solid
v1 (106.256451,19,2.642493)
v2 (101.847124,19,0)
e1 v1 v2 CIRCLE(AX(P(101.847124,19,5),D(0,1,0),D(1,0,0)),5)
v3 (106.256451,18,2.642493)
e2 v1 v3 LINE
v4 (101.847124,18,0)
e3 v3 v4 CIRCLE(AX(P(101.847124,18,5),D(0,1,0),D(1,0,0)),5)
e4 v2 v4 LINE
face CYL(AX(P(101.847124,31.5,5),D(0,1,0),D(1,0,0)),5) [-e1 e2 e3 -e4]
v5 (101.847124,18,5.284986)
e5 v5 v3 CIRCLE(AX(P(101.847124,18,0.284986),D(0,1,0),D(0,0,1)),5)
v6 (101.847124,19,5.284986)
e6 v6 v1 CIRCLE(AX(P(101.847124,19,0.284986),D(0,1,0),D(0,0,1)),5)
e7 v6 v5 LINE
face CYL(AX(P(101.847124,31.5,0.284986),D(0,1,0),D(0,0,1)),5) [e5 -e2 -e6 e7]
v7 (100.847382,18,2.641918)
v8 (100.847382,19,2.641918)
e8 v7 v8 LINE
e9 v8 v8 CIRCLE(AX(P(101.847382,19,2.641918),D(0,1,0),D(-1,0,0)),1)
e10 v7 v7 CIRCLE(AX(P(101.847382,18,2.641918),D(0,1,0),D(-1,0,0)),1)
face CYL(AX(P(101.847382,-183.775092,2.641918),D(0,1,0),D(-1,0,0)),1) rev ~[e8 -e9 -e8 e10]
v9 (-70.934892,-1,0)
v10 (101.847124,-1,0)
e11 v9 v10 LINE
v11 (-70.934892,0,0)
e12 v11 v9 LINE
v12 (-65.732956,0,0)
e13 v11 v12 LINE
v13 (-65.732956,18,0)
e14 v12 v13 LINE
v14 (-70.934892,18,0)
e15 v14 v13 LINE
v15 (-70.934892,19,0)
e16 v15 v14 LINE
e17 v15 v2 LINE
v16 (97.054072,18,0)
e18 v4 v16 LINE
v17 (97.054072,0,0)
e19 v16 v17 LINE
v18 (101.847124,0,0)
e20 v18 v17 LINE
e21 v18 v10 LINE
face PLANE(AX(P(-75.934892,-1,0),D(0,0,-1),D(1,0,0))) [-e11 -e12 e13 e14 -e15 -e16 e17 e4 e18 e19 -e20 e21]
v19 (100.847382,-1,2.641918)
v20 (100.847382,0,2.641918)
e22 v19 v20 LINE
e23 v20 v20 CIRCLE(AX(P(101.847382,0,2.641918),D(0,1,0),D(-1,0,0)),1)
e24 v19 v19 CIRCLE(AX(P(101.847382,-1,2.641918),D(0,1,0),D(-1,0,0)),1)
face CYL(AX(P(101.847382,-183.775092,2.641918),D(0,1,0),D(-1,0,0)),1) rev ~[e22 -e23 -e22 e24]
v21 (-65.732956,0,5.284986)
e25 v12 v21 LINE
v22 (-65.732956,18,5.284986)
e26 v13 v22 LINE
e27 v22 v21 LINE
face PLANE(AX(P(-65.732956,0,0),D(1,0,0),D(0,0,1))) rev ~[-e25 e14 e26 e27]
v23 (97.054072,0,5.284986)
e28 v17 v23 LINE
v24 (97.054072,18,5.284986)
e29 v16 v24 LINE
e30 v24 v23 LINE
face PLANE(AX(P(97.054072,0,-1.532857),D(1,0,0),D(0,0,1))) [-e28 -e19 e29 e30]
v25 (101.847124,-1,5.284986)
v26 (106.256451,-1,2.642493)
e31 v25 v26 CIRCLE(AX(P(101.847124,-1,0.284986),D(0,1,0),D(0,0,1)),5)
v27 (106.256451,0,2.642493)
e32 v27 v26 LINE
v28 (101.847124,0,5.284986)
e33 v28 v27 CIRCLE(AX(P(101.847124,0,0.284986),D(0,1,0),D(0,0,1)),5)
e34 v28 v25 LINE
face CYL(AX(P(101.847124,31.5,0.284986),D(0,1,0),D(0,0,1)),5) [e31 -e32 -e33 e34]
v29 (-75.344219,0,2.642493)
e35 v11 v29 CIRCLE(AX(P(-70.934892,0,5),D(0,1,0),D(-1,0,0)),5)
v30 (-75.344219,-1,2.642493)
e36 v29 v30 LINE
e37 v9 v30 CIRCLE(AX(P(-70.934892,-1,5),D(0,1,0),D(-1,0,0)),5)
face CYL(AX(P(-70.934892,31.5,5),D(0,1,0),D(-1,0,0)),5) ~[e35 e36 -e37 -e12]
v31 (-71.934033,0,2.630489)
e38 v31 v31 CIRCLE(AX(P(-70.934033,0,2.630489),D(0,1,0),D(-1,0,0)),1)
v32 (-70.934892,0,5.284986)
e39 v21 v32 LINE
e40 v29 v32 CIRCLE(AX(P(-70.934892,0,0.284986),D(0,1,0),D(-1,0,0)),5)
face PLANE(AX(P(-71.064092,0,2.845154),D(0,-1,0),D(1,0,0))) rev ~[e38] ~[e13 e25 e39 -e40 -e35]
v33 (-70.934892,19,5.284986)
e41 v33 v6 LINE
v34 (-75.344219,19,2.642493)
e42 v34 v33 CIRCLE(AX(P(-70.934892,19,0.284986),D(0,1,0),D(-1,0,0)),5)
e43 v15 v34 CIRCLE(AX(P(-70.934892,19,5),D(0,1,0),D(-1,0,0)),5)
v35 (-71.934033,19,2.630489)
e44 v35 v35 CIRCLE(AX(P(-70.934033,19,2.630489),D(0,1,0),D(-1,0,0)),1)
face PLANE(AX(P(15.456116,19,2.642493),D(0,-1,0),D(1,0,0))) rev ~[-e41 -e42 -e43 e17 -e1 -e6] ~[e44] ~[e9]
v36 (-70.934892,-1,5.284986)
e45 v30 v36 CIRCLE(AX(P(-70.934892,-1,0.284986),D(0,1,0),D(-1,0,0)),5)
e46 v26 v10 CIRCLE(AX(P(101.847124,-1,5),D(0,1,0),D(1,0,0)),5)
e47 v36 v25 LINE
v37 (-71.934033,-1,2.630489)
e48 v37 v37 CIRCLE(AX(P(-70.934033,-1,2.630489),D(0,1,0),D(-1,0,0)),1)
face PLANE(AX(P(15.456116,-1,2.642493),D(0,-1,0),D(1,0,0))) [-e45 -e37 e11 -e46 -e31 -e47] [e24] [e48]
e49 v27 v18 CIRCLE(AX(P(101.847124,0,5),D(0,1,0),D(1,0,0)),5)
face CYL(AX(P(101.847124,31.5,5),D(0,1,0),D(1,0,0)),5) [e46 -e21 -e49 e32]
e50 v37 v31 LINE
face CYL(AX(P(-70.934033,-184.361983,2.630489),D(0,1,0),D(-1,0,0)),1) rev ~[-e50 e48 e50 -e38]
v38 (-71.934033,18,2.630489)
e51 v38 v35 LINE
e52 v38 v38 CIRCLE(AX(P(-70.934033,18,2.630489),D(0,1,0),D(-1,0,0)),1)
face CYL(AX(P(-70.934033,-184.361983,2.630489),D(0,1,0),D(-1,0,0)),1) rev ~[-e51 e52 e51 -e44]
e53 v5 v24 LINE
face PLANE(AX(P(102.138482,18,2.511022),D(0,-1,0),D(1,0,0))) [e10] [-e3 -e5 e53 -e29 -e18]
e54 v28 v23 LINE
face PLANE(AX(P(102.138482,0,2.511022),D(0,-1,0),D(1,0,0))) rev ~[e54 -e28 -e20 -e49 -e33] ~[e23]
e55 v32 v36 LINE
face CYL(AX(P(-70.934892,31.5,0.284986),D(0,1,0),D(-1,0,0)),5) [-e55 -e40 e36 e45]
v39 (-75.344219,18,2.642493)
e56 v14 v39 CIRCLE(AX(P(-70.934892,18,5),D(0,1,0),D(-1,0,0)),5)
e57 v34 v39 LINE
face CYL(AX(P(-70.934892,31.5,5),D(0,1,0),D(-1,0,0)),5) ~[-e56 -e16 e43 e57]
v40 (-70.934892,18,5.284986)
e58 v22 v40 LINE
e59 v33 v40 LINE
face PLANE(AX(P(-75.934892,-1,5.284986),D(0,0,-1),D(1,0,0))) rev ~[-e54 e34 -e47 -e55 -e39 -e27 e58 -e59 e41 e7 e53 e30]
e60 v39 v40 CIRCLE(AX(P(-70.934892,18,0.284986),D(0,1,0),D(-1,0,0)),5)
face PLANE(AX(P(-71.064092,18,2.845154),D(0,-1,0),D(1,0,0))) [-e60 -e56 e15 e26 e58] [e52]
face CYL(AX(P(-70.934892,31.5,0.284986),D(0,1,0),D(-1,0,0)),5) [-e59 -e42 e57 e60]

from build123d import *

# Parameters (mm, degrees)
F0_W        = 182.7820166945
F0_H        = 5.2849859931
F1_DEPTH    = 20
F2_T1_DEPTH = 45
F3_D        = 2
F4_T1_DEPTH = 45
F5_D        = 2
F6_W        = 10.6622725725
F6_H        = 5.6903085506
F9_DEPTH    = 18
F6_W_2      = 10.1688206196
F6_H_2      = 8.087759139
F10_DEPTH   = 18


# Not quite as in the source:
# - a fillet or chamfer that OpenCascade refuses, or shapes differently, is made with other operations: its cross-section is extruded or revolved along the edge and cut away or added


with BuildPart() as f1:
    # F0 (on Front) → F1 (new body)
    with BuildSketch(Plane.XZ):
        with Locations((16.4561159909, 2.6424929965)):
            Rectangle(F0_W, F0_H)
    extrude(amount=-F1_DEPTH)

    # F2: fillet of radius 5 on 2 edges, made by hand

    # F2_s2 → F2_t1 (cut)
    with BuildSketch(Plane.XZ.offset(-32.5)):
        with BuildLine():
            ThreePointArc((-74.9348923564, 0.2849859931), (-73.4704262623, 3.820519899), (-69.9348923564, 5.2849859931))
            Line((-69.9348923564, 5.2849859931), (-74.9348923564, 5.2849859931))
            Line((-74.9348923564, 5.2849859931), (-74.9348923564, 0.2849859931))
        make_face()
        with BuildLine():
            ThreePointArc((-74.9348923564, 5), (-73.4704262623, 1.4644660941), (-69.9348923564, 0))
            Line((-69.9348923564, 0), (-74.9348923564, 0))
            Line((-74.9348923564, 0), (-74.9348923564, 5))
        make_face()
    extrude(amount=F2_T1_DEPTH, mode=Mode.SUBTRACT)

    # F3 (through all)
    with Locations(Plane.XZ):
        with Locations((-69.9340328574, 2.630488947)):
            Hole(F3_D / 2)

    # F4: fillet of radius 5 on 2 edges, made by hand

    # F4_s2 → F4_t1 (cut)
    with BuildSketch(Plane.XZ.offset(-32.5)):
        with BuildLine():
            ThreePointArc((102.8471243382, 5.2849859931), (106.3826582441, 3.820519899), (107.8471243382, 0.2849859931))
            Line((107.8471243382, 0.2849859931), (107.8471243382, 5.2849859931))
            Line((107.8471243382, 5.2849859931), (102.8471243382, 5.2849859931))
        make_face()
        with BuildLine():
            ThreePointArc((107.8471243382, 5), (106.3826582441, 1.4644660941), (102.8471243382, 0))
            Line((102.8471243382, 0), (107.8471243382, 0))
            Line((107.8471243382, 0), (107.8471243382, 5))
        make_face()
    extrude(amount=F4_T1_DEPTH, mode=Mode.SUBTRACT)

    # F5 (through all)
    with Locations(Plane.XZ):
        with Locations((102.8473824263, 2.641917672)):
            Hole(F5_D / 2)


with BuildPart() as f1_1:
    # F7: moved
    add(f1.part.moved(Location((-1, 1, 0))))


with BuildPart() as f1_2:
    # F8: moved
    add(f1_1.part.moved(Location((0, -2, 0))))

    # F6 (on Front) → F9 (cut)
    with BuildSketch(Plane.XZ):
        with Locations((-71.0640922189, 2.8451542753)):
            Rectangle(F6_W, F6_H)
    extrude(amount=-F9_DEPTH, mode=Mode.SUBTRACT)

    # F6 (on Front) → F10 (cut)
    with BuildSketch(Plane.XZ):
        with Locations((102.1384820342, 2.511022496)):
            Rectangle(F6_W_2, F6_H_2)
    extrude(amount=-F10_DEPTH, mode=Mode.SUBTRACT)


solid = f1_2.part
